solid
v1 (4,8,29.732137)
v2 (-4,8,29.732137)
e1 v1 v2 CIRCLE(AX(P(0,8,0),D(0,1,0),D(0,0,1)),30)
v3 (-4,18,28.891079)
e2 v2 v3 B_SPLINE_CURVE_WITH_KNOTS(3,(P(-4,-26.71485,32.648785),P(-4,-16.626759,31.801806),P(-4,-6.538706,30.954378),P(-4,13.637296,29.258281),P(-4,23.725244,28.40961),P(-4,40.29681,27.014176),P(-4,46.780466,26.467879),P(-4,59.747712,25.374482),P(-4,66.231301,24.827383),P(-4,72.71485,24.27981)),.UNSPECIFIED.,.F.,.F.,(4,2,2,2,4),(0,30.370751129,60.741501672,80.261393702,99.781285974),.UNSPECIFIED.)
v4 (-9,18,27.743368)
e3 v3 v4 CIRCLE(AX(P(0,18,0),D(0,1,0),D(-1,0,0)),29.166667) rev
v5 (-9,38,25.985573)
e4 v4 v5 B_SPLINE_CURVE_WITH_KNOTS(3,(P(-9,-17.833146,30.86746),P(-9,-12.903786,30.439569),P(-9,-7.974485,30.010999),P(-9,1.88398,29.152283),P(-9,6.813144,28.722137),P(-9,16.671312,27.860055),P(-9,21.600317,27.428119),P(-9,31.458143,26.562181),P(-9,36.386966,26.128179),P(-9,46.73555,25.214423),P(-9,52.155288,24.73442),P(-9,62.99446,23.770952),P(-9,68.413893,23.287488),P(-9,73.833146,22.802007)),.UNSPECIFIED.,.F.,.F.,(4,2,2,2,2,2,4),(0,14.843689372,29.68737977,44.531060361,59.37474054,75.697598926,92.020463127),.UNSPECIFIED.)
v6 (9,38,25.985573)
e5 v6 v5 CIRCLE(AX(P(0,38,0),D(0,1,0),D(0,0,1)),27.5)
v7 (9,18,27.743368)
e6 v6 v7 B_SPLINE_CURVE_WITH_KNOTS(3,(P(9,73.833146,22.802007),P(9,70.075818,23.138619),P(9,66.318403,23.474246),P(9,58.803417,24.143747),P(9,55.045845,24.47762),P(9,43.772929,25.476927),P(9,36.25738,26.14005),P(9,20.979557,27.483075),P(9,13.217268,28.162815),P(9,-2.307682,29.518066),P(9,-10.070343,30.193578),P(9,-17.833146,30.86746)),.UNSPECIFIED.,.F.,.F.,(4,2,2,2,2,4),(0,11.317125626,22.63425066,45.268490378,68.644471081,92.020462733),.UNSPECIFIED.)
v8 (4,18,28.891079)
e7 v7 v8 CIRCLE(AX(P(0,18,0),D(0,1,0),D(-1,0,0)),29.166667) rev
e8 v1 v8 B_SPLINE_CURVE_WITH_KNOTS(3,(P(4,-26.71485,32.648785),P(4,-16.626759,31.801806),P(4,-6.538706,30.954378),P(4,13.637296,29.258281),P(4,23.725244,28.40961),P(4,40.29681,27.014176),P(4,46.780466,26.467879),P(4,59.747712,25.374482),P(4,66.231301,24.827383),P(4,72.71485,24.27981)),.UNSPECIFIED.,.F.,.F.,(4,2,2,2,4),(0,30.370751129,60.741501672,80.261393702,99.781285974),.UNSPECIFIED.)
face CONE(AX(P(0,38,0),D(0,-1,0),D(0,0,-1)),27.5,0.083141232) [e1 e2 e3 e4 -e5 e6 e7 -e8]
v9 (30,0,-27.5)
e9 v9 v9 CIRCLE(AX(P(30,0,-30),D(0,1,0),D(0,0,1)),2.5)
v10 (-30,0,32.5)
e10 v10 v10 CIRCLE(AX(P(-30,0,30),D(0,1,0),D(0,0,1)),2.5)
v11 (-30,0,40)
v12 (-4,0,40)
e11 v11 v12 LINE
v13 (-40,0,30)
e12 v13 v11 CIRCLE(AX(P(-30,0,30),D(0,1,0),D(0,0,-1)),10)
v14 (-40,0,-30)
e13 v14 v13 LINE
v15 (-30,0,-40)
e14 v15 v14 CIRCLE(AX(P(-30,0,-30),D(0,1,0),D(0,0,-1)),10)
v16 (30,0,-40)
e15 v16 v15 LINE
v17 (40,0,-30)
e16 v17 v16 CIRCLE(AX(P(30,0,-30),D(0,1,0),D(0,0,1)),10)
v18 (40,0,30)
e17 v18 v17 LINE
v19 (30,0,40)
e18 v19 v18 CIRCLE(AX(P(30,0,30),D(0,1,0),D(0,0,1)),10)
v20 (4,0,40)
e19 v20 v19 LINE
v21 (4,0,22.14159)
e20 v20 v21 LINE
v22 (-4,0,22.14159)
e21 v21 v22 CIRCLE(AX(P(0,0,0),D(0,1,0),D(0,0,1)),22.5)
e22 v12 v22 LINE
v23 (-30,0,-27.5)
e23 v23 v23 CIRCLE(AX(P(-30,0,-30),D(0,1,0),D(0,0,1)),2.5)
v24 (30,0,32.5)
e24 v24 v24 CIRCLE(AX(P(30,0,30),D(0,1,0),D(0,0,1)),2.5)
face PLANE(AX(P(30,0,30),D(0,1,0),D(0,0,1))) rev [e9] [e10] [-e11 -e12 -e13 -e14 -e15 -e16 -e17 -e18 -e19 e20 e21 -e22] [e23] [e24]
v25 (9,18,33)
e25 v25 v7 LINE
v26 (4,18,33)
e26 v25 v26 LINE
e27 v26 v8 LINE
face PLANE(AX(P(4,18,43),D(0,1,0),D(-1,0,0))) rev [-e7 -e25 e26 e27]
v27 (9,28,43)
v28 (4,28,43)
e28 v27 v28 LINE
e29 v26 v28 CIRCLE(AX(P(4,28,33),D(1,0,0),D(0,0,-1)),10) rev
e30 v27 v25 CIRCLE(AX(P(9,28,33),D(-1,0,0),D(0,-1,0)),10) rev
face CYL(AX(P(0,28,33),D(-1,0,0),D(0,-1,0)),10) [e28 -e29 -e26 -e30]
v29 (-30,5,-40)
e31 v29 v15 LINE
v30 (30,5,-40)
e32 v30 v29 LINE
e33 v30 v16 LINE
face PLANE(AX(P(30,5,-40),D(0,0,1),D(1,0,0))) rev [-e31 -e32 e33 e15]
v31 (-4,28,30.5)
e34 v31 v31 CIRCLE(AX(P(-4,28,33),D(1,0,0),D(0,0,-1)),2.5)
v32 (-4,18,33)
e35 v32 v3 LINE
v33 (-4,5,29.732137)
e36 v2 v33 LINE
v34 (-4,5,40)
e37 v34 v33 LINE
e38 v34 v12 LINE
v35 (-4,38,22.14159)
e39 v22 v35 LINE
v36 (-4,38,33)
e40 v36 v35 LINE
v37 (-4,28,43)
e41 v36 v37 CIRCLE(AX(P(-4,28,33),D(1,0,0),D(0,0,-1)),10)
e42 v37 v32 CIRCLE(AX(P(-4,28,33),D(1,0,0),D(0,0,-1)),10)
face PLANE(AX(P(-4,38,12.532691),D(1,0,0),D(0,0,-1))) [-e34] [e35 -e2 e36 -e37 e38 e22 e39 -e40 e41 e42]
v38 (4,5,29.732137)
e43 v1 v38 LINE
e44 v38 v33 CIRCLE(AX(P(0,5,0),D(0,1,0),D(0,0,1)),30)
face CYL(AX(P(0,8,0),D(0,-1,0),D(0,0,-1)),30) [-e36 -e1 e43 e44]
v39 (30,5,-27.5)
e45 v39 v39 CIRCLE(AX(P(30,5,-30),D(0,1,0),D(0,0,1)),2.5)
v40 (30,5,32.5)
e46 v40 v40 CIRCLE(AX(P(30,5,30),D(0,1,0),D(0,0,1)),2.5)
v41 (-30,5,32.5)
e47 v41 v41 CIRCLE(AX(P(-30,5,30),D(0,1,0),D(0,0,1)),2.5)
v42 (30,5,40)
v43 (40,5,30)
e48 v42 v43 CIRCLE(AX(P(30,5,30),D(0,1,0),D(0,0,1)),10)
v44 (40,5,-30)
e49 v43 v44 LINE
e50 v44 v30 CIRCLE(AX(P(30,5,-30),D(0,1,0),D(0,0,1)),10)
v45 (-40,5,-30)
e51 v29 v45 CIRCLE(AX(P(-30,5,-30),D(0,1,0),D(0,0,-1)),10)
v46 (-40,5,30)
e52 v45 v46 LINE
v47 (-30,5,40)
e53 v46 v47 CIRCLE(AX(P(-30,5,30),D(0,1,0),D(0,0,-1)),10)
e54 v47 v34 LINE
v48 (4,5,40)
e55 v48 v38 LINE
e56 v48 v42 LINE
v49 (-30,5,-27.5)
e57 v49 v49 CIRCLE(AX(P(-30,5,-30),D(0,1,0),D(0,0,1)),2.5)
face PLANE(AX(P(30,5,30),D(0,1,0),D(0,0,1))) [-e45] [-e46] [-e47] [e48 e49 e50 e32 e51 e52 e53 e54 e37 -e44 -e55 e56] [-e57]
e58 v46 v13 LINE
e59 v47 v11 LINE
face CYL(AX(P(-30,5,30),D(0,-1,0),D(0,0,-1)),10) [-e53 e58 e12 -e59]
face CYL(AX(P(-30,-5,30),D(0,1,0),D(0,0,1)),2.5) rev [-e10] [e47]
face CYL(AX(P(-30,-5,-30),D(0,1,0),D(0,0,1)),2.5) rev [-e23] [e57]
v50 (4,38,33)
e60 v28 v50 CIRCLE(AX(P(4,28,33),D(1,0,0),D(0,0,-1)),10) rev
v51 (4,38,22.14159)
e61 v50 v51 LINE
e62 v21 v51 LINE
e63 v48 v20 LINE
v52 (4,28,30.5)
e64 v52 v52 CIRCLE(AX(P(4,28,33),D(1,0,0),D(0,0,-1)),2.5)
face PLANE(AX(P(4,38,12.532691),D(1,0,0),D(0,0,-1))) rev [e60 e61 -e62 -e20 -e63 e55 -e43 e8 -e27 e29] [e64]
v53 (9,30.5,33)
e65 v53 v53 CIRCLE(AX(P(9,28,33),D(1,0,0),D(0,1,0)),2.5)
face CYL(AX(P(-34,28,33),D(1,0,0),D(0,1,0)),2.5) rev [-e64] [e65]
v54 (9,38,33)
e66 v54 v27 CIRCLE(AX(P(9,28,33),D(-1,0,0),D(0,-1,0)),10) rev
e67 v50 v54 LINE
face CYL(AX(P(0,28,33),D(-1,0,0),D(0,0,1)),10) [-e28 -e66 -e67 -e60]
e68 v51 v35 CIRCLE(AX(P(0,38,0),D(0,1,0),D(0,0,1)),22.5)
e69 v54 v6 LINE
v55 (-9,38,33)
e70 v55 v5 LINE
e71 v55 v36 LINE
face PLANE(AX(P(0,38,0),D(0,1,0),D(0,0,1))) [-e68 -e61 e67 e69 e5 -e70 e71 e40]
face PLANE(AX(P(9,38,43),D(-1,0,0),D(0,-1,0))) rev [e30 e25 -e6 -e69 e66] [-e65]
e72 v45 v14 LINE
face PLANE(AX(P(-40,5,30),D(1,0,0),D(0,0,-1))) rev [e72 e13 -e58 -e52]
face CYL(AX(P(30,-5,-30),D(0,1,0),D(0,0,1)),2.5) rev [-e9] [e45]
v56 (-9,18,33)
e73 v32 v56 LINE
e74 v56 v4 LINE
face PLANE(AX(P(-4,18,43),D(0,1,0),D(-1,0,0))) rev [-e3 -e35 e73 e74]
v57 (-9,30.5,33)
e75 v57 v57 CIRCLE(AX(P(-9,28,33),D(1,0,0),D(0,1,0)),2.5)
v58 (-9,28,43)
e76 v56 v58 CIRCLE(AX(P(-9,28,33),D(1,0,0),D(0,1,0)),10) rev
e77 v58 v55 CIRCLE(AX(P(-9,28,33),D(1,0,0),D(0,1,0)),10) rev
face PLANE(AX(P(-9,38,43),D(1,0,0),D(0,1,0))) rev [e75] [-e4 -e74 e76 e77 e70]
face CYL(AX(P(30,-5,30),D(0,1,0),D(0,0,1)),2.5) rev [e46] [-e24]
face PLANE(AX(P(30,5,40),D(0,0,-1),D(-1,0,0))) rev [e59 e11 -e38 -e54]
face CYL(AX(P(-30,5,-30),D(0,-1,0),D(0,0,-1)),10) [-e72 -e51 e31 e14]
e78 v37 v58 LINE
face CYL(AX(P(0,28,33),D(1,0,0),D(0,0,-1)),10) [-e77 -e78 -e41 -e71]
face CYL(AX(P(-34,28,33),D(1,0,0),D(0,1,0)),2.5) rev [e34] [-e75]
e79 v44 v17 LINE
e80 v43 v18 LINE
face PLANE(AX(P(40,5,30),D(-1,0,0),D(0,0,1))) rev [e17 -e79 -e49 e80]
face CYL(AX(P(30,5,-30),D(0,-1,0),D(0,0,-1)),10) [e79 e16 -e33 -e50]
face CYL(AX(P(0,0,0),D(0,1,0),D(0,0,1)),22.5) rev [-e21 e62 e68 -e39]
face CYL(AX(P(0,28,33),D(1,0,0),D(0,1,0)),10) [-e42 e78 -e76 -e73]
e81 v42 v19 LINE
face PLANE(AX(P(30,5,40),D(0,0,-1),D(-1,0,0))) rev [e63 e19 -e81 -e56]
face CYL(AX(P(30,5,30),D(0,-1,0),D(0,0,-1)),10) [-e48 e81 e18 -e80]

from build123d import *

# Parameters (mm, degrees)
BOSS_EXTRUDE1_DEPTH     = 5
SKETCH2_R               = 30
BOSS_EXTRUDE2_DEPTH     = 3
SKETCH3_R               = 27.5
BOSS_EXTRUDE3_DEPTH     = 30
SKETCH4_R               = 22.5
CUT_EXTRUDE1_DEPTH      = 69.14690015
SKETCH6_R               = 22.5
CUT_EXTRUDE2_DEPTH      = 69.14690015
CUT_EXTRUDE5_DEPTH      = 69.146900205
CUT_EXTRUDE5_DEPTH_BACK = 13
SKETCH7_W               = 8
SKETCH7_H               = 27.467309478
SKETCH8_W               = 5
SKETCH8_H               = 20
BOSS_EXTRUDE4_DEPTH     = 43
FILLET1_R               = 10
SKETCH9_R               = 2.5
CUT_EXTRUDE6_DEPTH      = 43
SKETCH10_R              = 22.5
CUT_EXTRUDE7_DEPTH      = 43
SKETCH11_R              = 2.5
CUT_EXTRUDE8_DEPTH      = 10


with BuildPart() as part:
    # Sketch1 → Boss-Extrude1 (new body)
    with BuildSketch(Plane(origin=(0, 0, 0), x_dir=(1, 0, 0), z_dir=(0, 1, 0))):
        with BuildLine():
            Line((30, -40), (-30, -40))
            ThreePointArc((-30, -40), (-37.071067812, -37.071067812), (-40, -30))
            Line((-40, -30), (-40, 30))
            ThreePointArc((-40, 30), (-37.071067812, 37.071067812), (-30, 40))
            Line((-30, 40), (30, 40))
            ThreePointArc((30, 40), (37.071067812, 37.071067812), (40, 30))
            Line((40, 30), (40, -30))
            ThreePointArc((40, -30), (37.071067812, -37.071067812), (30, -40))
        make_face()
    extrude(amount=BOSS_EXTRUDE1_DEPTH)

    # Sketch2 → Boss-Extrude2 (add)
    with BuildSketch(Plane(origin=(0, 5, 0), x_dir=(1, 0, 0), z_dir=(0, 1, 0))):
        with Locations(Location((0, 0, 0), (0, 0, 270))):
            Circle(SKETCH2_R)
    extrude(amount=BOSS_EXTRUDE2_DEPTH)

    # Sketch3 → Boss-Extrude3 (add)
    with BuildSketch(Plane(origin=(0, 8, 0), x_dir=(1, 0, 0), z_dir=(0, 1, 0))):
        with Locations(Location((0, 0, 0), (0, 0, 270))):
            Circle(SKETCH3_R)
    extrude(amount=BOSS_EXTRUDE3_DEPTH)

    # Sketch4 → Cut-Extrude1 (cut, through all)
    with BuildSketch(Plane(origin=(0, 38, 0), x_dir=(1, 0, 0), z_dir=(0, 1, 0))):
        with Locations(Location((0, 0, 0), (0, 0, 270))):
            Circle(SKETCH4_R)
    extrude(amount=-CUT_EXTRUDE1_DEPTH, mode=Mode.SUBTRACT)

    # loft up to a face of the part (loft1)
    loft([Face(Wire([part.edges().sort_by_distance((21.869058823, 8, -20.536413178))[0]])), Face(Wire([part.edges().sort_by_distance((-20.046637254, 38, -18.825045413))[0]]))])

    # Sketch6 → Cut-Extrude2 (cut, through all)
    with BuildSketch(Plane(origin=(0, 38, 0), x_dir=(1, 0, 0), z_dir=(0, 1, 0))):
        with Locations(Location((0, 0, 0), (0, 0, 270))):
            Circle(SKETCH6_R)
    extrude(amount=-CUT_EXTRUDE2_DEPTH, mode=Mode.SUBTRACT)

    # Sketch7 → Cut-Extrude5 (cut, two sides: drawn at the far end of the back side and taken through both)
    with BuildSketch(Plane(origin=(0, 0, 0), x_dir=(1, 0, 0), z_dir=(0, 1, 0)).offset(-CUT_EXTRUDE5_DEPTH_BACK)):
        with Locations((0, -26.266345261)):
            Rectangle(SKETCH7_W, SKETCH7_H)
    extrude(amount=CUT_EXTRUDE5_DEPTH + CUT_EXTRUDE5_DEPTH_BACK, mode=Mode.SUBTRACT)

    # Sketch8 → Boss-Extrude4 (add)
    with BuildSketch(Plane.XY):
        with Locations((-6.5, 28)):
            Rectangle(SKETCH8_W, SKETCH8_H)
        with Locations((6.5, 28)):
            Rectangle(SKETCH8_W, SKETCH8_H)
    extrude(amount=BOSS_EXTRUDE4_DEPTH)

    # Fillet1
    fillet1_edges = [part.edges().sort_by_distance(p)[0] for p in [
        (6.5, 18, 43),
        (-6.5, 18, 43),
        (6.5, 38, 43),
        (-6.5, 38, 43),
    ]]
    fillet(fillet1_edges, radius=FILLET1_R - 0.0001)  # a hair under: the kernel refuses the full size

    # Sketch9 → Cut-Extrude6 (cut)
    with BuildSketch(Plane(origin=(9, 0, 0), x_dir=(0, 0, -1), z_dir=(1, 0, 0))):
        with Locations(Location((-33, 28, 0), (0, 0, 90))):
            Circle(SKETCH9_R)
    extrude(amount=-CUT_EXTRUDE6_DEPTH, mode=Mode.SUBTRACT)

    # Sketch10 → Cut-Extrude7 (cut)
    with BuildSketch(Plane(origin=(0, 38, 0), x_dir=(1, 0, 0), z_dir=(0, 1, 0))):
        Circle(SKETCH10_R)
    extrude(amount=-CUT_EXTRUDE7_DEPTH, mode=Mode.SUBTRACT)

    # Sketch11 → Cut-Extrude8 (cut)
    with BuildSketch(Plane(origin=(0, 5, 0), x_dir=(1, 0, 0), z_dir=(0, 1, 0))):
        with Locations(Location((30, -30, 0), (0, 0, 270))):
            Circle(SKETCH11_R)
        with Locations(Location((-30, -30, 0), (0, 0, 270))):
            Circle(SKETCH11_R)
        with Locations(Location((30, 30, 0), (0, 0, 270))):
            Circle(SKETCH11_R)
        with Locations(Location((-30, 30, 0), (0, 0, 270))):
            Circle(SKETCH11_R)
    extrude(amount=-CUT_EXTRUDE8_DEPTH, mode=Mode.SUBTRACT)


solid = part.part
